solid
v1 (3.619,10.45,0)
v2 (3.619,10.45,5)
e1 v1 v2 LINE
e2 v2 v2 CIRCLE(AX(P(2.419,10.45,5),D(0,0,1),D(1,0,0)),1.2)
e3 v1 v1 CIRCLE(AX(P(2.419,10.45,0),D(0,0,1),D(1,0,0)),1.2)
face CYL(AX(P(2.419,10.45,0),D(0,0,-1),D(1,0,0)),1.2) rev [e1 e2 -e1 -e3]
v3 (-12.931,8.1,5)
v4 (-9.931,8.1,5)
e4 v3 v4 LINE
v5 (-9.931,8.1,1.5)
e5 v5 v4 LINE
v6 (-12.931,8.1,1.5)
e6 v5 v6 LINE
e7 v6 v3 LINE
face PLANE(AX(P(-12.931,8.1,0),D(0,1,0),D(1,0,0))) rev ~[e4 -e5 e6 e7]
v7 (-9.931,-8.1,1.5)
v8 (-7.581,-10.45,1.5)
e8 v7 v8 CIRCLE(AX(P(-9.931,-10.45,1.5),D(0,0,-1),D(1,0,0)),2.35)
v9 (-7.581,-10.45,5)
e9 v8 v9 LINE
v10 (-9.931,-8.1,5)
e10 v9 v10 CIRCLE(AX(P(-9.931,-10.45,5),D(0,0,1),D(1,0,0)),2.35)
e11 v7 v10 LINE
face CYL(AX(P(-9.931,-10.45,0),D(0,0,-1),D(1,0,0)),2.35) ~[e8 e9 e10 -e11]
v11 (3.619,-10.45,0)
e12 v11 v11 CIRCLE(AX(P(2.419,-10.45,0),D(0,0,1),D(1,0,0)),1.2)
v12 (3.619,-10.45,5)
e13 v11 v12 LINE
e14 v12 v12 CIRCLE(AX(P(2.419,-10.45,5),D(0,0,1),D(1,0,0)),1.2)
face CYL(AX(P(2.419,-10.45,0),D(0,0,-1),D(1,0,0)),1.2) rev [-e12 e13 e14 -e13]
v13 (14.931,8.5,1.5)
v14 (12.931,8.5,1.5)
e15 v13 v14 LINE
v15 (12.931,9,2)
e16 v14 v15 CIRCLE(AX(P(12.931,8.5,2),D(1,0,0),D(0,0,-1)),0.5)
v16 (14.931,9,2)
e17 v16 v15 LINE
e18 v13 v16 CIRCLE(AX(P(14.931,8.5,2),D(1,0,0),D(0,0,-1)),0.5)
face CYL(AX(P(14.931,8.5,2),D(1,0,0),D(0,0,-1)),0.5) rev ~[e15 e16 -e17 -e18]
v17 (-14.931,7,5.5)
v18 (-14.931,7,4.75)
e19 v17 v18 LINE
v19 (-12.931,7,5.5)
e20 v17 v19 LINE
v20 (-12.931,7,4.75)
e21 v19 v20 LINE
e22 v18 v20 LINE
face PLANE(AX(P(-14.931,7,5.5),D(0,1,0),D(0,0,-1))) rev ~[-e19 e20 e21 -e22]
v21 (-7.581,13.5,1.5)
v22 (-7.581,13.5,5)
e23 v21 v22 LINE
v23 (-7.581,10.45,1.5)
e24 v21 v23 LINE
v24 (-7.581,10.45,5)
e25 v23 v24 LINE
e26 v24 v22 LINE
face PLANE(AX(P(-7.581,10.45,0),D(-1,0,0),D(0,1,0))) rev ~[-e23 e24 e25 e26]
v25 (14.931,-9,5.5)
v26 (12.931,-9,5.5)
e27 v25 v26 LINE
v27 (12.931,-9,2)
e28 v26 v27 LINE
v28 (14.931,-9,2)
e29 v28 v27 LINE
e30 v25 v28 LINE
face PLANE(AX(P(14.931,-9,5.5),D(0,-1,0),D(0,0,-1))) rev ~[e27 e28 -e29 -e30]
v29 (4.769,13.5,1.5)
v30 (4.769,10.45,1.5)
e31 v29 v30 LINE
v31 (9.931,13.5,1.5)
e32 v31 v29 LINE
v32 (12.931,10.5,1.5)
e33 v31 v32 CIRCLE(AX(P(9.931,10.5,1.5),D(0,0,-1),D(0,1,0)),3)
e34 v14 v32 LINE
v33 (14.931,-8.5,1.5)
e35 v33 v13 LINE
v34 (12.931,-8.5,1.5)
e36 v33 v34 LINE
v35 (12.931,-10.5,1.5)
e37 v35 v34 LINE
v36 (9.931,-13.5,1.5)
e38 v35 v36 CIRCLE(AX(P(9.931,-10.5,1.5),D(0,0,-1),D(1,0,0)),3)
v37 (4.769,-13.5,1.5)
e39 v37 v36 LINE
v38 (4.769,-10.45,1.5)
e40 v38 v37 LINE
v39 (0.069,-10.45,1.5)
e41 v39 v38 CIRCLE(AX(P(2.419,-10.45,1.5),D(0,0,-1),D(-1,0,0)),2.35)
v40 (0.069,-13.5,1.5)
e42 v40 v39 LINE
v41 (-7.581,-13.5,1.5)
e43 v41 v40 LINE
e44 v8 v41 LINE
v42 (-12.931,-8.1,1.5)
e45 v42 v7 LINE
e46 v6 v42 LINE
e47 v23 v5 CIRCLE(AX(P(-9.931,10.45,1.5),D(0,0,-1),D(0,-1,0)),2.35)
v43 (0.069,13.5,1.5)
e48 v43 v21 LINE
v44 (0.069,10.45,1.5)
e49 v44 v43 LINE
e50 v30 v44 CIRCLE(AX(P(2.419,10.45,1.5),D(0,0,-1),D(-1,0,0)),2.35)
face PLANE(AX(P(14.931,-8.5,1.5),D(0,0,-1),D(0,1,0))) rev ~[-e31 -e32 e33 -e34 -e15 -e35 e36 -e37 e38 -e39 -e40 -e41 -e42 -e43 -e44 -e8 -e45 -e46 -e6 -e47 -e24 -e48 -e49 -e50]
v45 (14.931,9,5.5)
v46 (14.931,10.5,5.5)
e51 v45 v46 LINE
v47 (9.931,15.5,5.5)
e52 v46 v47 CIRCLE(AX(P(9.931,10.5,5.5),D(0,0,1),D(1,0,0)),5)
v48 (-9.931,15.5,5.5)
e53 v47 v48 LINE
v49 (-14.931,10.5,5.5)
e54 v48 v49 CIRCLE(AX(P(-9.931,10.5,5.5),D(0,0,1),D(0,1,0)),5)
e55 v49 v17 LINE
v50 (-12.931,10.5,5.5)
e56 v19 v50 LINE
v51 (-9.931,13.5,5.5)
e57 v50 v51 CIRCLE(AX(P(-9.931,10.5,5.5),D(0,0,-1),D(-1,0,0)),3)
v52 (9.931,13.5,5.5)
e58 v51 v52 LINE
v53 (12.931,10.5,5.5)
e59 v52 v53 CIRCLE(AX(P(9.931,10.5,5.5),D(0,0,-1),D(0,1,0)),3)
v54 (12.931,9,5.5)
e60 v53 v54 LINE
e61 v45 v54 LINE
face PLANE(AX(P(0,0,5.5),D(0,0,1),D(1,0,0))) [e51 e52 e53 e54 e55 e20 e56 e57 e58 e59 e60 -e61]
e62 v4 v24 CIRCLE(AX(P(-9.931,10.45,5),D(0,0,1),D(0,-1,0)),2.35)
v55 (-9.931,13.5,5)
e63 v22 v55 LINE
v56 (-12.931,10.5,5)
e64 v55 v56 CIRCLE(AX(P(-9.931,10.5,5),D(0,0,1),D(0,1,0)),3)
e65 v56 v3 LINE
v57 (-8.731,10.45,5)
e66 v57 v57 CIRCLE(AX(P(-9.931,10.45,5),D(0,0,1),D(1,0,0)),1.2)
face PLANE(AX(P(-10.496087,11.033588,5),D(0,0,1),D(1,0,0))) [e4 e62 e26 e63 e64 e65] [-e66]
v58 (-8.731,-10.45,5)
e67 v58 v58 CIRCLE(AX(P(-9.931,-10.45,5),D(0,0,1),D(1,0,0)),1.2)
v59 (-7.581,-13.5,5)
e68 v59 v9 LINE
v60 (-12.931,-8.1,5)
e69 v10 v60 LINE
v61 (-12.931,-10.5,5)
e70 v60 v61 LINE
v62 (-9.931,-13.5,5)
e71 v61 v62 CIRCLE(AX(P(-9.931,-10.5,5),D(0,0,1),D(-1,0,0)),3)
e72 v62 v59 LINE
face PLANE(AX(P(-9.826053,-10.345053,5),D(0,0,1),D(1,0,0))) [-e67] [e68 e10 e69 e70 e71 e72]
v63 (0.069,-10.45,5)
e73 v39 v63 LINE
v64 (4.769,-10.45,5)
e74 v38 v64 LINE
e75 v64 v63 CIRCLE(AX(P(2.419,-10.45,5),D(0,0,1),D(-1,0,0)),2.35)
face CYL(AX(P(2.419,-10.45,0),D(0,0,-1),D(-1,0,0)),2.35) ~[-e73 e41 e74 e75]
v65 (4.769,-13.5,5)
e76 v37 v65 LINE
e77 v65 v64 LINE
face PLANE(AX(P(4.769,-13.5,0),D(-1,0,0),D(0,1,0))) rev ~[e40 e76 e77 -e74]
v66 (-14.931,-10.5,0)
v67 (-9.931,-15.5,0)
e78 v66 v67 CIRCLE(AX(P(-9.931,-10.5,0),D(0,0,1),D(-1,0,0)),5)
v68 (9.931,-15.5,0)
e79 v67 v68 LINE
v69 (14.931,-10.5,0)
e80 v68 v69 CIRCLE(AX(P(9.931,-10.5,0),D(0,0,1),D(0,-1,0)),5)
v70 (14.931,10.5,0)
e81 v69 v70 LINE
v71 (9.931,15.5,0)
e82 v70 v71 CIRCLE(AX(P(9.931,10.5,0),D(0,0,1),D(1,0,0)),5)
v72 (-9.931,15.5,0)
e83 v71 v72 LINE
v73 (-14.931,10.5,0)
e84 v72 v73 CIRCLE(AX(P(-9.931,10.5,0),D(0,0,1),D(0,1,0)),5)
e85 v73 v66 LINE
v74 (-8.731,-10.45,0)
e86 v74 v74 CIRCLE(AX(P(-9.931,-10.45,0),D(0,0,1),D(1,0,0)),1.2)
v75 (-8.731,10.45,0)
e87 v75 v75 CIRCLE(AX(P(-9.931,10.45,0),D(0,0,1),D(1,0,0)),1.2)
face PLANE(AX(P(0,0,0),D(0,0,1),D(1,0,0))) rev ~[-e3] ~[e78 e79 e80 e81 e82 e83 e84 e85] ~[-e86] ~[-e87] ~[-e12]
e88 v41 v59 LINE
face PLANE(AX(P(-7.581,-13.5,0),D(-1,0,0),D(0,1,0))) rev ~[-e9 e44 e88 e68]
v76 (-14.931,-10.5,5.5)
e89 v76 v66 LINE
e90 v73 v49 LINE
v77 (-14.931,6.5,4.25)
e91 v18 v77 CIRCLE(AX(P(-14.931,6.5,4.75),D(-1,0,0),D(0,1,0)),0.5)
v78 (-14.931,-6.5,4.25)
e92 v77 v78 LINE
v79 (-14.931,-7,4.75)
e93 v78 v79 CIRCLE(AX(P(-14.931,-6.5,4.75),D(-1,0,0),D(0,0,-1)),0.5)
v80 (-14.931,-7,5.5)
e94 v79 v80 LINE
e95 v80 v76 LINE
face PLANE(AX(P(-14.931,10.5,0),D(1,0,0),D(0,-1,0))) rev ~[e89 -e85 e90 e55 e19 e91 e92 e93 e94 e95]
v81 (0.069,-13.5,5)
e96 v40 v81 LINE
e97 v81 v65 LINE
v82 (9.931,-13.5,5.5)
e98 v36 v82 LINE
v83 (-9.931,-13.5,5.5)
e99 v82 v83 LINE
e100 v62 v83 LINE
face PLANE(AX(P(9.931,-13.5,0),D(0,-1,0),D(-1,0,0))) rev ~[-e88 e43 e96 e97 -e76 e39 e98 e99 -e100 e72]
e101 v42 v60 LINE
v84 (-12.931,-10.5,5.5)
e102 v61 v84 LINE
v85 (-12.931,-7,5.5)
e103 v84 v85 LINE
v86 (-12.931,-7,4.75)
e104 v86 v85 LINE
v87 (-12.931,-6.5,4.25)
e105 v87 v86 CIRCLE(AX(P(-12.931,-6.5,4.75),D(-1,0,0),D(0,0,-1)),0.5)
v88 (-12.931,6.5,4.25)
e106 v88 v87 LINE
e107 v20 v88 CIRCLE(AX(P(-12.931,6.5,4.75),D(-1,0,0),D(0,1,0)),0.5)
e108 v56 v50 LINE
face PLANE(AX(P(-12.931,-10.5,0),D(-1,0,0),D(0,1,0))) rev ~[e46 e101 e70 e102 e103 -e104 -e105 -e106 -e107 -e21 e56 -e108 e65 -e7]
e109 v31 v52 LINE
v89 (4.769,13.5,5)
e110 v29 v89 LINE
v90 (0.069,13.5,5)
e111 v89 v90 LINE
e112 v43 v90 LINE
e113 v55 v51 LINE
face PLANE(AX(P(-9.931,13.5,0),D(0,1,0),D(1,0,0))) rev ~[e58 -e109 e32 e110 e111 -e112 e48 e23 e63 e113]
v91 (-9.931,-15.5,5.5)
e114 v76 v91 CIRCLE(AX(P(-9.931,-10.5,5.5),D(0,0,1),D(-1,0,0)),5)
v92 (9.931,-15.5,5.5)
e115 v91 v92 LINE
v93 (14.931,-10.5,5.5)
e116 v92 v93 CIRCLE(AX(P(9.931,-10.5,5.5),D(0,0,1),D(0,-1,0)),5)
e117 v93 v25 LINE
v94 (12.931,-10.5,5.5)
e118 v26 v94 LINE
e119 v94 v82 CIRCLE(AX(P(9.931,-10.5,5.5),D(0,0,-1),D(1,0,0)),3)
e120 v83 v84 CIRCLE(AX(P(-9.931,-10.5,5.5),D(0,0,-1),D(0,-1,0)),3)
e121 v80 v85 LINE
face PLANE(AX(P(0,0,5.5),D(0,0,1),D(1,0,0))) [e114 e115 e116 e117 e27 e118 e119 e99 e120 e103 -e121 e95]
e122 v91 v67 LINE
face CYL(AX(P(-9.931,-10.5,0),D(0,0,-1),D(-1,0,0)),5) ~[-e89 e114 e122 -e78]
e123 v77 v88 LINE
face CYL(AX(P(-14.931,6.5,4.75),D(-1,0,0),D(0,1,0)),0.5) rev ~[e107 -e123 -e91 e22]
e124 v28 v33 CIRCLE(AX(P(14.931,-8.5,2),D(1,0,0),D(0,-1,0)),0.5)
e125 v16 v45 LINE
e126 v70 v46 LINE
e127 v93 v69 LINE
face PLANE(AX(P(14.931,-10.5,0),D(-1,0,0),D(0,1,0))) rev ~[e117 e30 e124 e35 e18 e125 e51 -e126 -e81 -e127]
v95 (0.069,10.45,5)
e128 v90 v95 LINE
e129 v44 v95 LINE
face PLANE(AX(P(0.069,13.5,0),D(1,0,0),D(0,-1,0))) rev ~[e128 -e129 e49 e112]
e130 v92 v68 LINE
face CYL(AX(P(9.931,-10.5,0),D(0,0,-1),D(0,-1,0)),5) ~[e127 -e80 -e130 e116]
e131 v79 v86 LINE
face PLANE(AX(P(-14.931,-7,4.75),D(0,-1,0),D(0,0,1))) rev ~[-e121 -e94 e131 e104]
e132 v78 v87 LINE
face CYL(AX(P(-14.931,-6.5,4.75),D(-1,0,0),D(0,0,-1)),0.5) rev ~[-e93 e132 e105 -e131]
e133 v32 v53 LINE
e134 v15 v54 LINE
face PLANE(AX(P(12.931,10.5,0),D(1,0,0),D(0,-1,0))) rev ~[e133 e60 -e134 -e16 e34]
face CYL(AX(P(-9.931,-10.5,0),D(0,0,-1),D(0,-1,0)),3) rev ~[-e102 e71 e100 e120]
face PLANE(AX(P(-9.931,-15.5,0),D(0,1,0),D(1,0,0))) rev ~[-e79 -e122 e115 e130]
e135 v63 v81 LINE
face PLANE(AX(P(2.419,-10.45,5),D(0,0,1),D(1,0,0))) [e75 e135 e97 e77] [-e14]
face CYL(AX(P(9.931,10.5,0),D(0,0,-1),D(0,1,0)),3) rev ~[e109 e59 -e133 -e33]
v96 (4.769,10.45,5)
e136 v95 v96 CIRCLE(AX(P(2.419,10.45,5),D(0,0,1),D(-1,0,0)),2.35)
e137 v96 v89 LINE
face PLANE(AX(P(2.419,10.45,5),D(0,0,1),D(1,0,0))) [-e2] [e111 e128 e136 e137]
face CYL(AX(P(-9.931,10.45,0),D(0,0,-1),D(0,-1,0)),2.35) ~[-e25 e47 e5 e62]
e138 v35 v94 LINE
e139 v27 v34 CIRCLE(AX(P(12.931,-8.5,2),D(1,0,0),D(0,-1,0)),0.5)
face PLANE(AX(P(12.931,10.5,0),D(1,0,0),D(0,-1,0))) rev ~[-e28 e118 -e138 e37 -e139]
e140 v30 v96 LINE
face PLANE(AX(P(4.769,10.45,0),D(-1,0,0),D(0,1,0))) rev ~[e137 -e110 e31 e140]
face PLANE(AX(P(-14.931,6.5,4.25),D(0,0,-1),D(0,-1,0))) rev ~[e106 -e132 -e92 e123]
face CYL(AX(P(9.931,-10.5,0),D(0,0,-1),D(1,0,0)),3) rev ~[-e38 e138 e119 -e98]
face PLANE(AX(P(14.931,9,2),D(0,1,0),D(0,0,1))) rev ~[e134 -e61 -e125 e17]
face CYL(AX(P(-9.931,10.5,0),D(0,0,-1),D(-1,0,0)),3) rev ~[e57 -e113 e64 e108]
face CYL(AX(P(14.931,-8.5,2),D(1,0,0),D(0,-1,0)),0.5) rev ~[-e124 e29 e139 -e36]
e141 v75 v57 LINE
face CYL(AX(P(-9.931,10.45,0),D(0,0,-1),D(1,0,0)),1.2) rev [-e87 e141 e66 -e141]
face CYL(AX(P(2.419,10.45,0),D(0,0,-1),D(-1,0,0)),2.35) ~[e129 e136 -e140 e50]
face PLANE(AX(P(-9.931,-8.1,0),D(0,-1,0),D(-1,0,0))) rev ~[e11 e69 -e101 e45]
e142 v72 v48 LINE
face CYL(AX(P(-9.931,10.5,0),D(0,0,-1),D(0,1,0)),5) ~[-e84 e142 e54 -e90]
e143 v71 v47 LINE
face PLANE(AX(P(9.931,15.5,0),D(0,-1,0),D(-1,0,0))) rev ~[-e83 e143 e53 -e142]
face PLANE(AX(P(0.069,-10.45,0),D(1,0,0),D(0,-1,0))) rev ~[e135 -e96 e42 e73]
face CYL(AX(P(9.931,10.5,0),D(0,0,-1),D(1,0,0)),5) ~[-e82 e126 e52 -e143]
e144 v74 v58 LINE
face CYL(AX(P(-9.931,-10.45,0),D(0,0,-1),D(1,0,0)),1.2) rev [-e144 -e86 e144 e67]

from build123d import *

# Parameters (mm, degrees)
F0_R     = 1.2
F1_DEPTH = 1.5
F2_DEPTH = 5
F3_DEPTH = 5.5
F5_DEPTH = 2
F7_DEPTH = 2


# Not quite as in the source:
# - a feature names something its author has since deleted; it is built from what else it names


with BuildPart() as f1:
    # F0 (on Top) → F1 (new body)
    with BuildSketch(Plane.XY):
        with BuildLine():
            Line((14.9310000289, -10.5), (14.9310000289, 10.5))
            ThreePointArc((14.9310000289, 10.5), (13.4665339264, 14.0355339264), (9.931, 15.5000000289))
            Line((9.931, 15.5000000289), (-9.931, 15.5000000289))
            ThreePointArc((-9.931, 15.5000000289), (-13.4665339264, 14.0355339264), (-14.9310000289, 10.5))
            Line((-14.9310000289, 10.5), (-14.9310000289, -10.5))
            ThreePointArc((-14.9310000289, -10.5), (-13.4665339264, -14.0355339264), (-9.931, -15.5000000289))
            Line((-9.931, -15.5000000289), (9.931, -15.5000000289))
            ThreePointArc((9.931, -15.5000000289), (13.4665339264, -14.0355339264), (14.9310000289, -10.5))
        make_face()
        with BuildLine():
            Line((-9.931, 13.5000000289), (-7.581, 13.5000000289))
            Line((-7.581, 13.5000000289), (0.069, 13.5000000289))
            Line((0.069, 13.5000000289), (4.769, 13.5000000289))
            Line((4.769, 13.5000000289), (9.931, 13.5000000289))
            ThreePointArc((9.931, 13.5000000289), (12.052320364, 12.621320364), (12.9310000289, 10.5))
            Line((12.9310000289, 10.5), (12.9310000289, -10.5))
            ThreePointArc((12.9310000289, -10.5), (12.052320364, -12.621320364), (9.931, -13.5000000289))
            Line((9.931, -13.5000000289), (4.769, -13.5000000289))
            Line((4.769, -13.5000000289), (0.069, -13.5000000289))
            Line((0.069, -13.5000000289), (-7.581, -13.5000000289))
            Line((-7.581, -13.5000000289), (-9.931, -13.5000000289))
            ThreePointArc((-9.931, -13.5000000289), (-12.052320364, -12.621320364), (-12.9310000289, -10.5))
            Line((-12.9310000289, -10.5), (-12.9310000289, -8.1))
            Line((-12.9310000289, -8.1), (-12.9310000289, 8.1))
            Line((-12.9310000289, 8.1), (-12.9310000289, 10.5))
            ThreePointArc((-12.9310000289, 10.5), (-12.052320364, 12.621320364), (-9.931, 13.5000000289))
        make_face(mode=Mode.SUBTRACT)
        with BuildLine():
            ThreePointArc((4.769, -10.45), (2.419, -8.1), (0.069, -10.45))
            ThreePointArc((0.069, -10.45), (2.419, -12.8), (4.769, -10.45))
        make_face()
        with Locations((2.419, -10.45)):
            Circle(F0_R, mode=Mode.SUBTRACT)
        with BuildLine():
            ThreePointArc((4.769, 10.45), (2.419, 12.8), (0.069, 10.45))
            ThreePointArc((0.069, 10.45), (2.419, 8.1), (4.769, 10.45))
        make_face()
        with Locations((2.419, 10.45)):
            Circle(F0_R, mode=Mode.SUBTRACT)
        with BuildLine():
            ThreePointArc((-9.931, 8.1), (-11.5927009358, 12.1117009358), (-7.581, 10.45))
            Line((-7.581, 10.45), (-7.581, 13.5000000289))
            Line((-7.581, 13.5000000289), (-9.931, 13.5000000289))
            ThreePointArc((-9.931, 13.5000000289), (-12.052320364, 12.621320364), (-12.9310000289, 10.5))
            Line((-12.9310000289, 10.5), (-12.9310000289, 8.1))
            Line((-12.9310000289, 8.1), (-9.931, 8.1))
        make_face()
        with BuildLine():
            Line((-9.931, -8.1), (-12.9310000289, -8.1))
            Line((-12.9310000289, -8.1), (-12.9310000289, -10.5))
            ThreePointArc((-12.9310000289, -10.5), (-12.052320364, -12.621320364), (-9.931, -13.5000000289))
            Line((-9.931, -13.5000000289), (-7.581, -13.5000000289))
            Line((-7.581, -13.5000000289), (-7.581, -10.45))
            ThreePointArc((-7.581, -10.45), (-11.5927009358, -12.1117009358), (-9.931, -8.1))
        make_face()
        with BuildLine():
            ThreePointArc((-7.581, -10.45), (-8.2692990642, -8.7882990642), (-9.931, -8.1))
            ThreePointArc((-9.931, -8.1), (-11.5927009358, -12.1117009358), (-7.581, -10.45))
        make_face()
        with Locations((-9.931, -10.45)):
            Circle(F0_R, mode=Mode.SUBTRACT)
        with BuildLine():
            Line((0.069, -10.45), (0.069, -13.5000000289))
            Line((0.069, -13.5000000289), (4.769, -13.5000000289))
            Line((4.769, -13.5000000289), (4.769, -10.45))
            ThreePointArc((4.769, -10.45), (2.419, -12.8), (0.069, -10.45))
        make_face()
        with BuildLine():
            ThreePointArc((-9.931, 8.1), (-8.2692990642, 8.7882990642), (-7.581, 10.45))
            ThreePointArc((-7.581, 10.45), (-11.5927009358, 12.1117009358), (-9.931, 8.1))
        make_face()
        with Locations((-9.931, 10.45)):
            Circle(F0_R, mode=Mode.SUBTRACT)
        with BuildLine():
            Line((4.769, 13.5000000289), (0.069, 13.5000000289))
            Line((0.069, 13.5000000289), (0.069, 10.45))
            ThreePointArc((0.069, 10.45), (2.419, 12.8), (4.769, 10.45))
            Line((4.769, 10.45), (4.769, 13.5000000289))
        make_face()
        with BuildLine():
            Line((-7.581, 13.5000000289), (-7.581, 10.45))
            ThreePointArc((-7.581, 10.45), (-8.2692990642, 8.7882990642), (-9.931, 8.1))
            Line((-9.931, 8.1), (-12.9310000289, 8.1))
            Line((-12.9310000289, 8.1), (-12.9310000289, -8.1))
            Line((-12.9310000289, -8.1), (-9.931, -8.1))
            ThreePointArc((-9.931, -8.1), (-8.2692990642, -8.7882990642), (-7.581, -10.45))
            Line((-7.581, -10.45), (-7.581, -13.5000000289))
            Line((-7.581, -13.5000000289), (0.069, -13.5000000289))
            Line((0.069, -13.5000000289), (0.069, -10.45))
            ThreePointArc((0.069, -10.45), (2.419, -8.1), (4.769, -10.45))
            Line((4.769, -10.45), (4.769, -13.5000000289))
            Line((4.769, -13.5000000289), (9.931, -13.5000000289))
            ThreePointArc((9.931, -13.5000000289), (12.052320364, -12.621320364), (12.9310000289, -10.5))
            Line((12.9310000289, -10.5), (12.9310000289, 10.5))
            ThreePointArc((12.9310000289, 10.5), (12.052320364, 12.621320364), (9.931, 13.5000000289))
            Line((9.931, 13.5000000289), (4.769, 13.5000000289))
            Line((4.769, 13.5000000289), (4.769, 10.45))
            ThreePointArc((4.769, 10.45), (2.419, 8.1), (0.069, 10.45))
            Line((0.069, 10.45), (0.069, 13.5000000289))
            Line((0.069, 13.5000000289), (-7.581, 13.5000000289))
        make_face()
    extrude(amount=F1_DEPTH)

    # F0 (on Top) → F2 (join)
    with BuildSketch(Plane.XY):
        with BuildLine():
            ThreePointArc((-9.931, 8.1), (-11.5927009358, 12.1117009358), (-7.581, 10.45))
            Line((-7.581, 10.45), (-7.581, 13.5000000289))
            Line((-7.581, 13.5000000289), (-9.931, 13.5000000289))
            ThreePointArc((-9.931, 13.5000000289), (-12.052320364, 12.621320364), (-12.9310000289, 10.5))
            Line((-12.9310000289, 10.5), (-12.9310000289, 8.1))
            Line((-12.9310000289, 8.1), (-9.931, 8.1))
        make_face()
        with BuildLine():
            ThreePointArc((-9.931, 8.1), (-8.2692990642, 8.7882990642), (-7.581, 10.45))
            ThreePointArc((-7.581, 10.45), (-11.5927009358, 12.1117009358), (-9.931, 8.1))
        make_face()
        with Locations((-9.931, 10.45)):
            Circle(F0_R, mode=Mode.SUBTRACT)
        with BuildLine():
            ThreePointArc((4.769, 10.45), (2.419, 12.8), (0.069, 10.45))
            ThreePointArc((0.069, 10.45), (2.419, 8.1), (4.769, 10.45))
        make_face()
        with Locations((2.419, 10.45)):
            Circle(F0_R, mode=Mode.SUBTRACT)
        with BuildLine():
            Line((4.769, 13.5000000289), (0.069, 13.5000000289))
            Line((0.069, 13.5000000289), (0.069, 10.45))
            ThreePointArc((0.069, 10.45), (2.419, 12.8), (4.769, 10.45))
            Line((4.769, 10.45), (4.769, 13.5000000289))
        make_face()
        with BuildLine():
            ThreePointArc((4.769, -10.45), (2.419, -8.1), (0.069, -10.45))
            ThreePointArc((0.069, -10.45), (2.419, -12.8), (4.769, -10.45))
        make_face()
        with Locations((2.419, -10.45)):
            Circle(F0_R, mode=Mode.SUBTRACT)
        with BuildLine():
            Line((0.069, -10.45), (0.069, -13.5000000289))
            Line((0.069, -13.5000000289), (4.769, -13.5000000289))
            Line((4.769, -13.5000000289), (4.769, -10.45))
            ThreePointArc((4.769, -10.45), (2.419, -12.8), (0.069, -10.45))
        make_face()
        with BuildLine():
            ThreePointArc((-7.581, -10.45), (-8.2692990642, -8.7882990642), (-9.931, -8.1))
            ThreePointArc((-9.931, -8.1), (-11.5927009358, -12.1117009358), (-7.581, -10.45))
        make_face()
        with Locations((-9.931, -10.45)):
            Circle(F0_R, mode=Mode.SUBTRACT)
        with BuildLine():
            Line((-9.931, -8.1), (-12.9310000289, -8.1))
            Line((-12.9310000289, -8.1), (-12.9310000289, -10.5))
            ThreePointArc((-12.9310000289, -10.5), (-12.052320364, -12.621320364), (-9.931, -13.5000000289))
            Line((-9.931, -13.5000000289), (-7.581, -13.5000000289))
            Line((-7.581, -13.5000000289), (-7.581, -10.45))
            ThreePointArc((-7.581, -10.45), (-11.5927009358, -12.1117009358), (-9.931, -8.1))
        make_face()
    extrude(amount=F2_DEPTH)

    # F0 (on Top) → F3 (join)
    with BuildSketch(Plane.XY):
        with BuildLine():
            Line((14.9310000289, -10.5), (14.9310000289, 10.5))
            ThreePointArc((14.9310000289, 10.5), (13.4665339264, 14.0355339264), (9.931, 15.5000000289))
            Line((9.931, 15.5000000289), (-9.931, 15.5000000289))
            ThreePointArc((-9.931, 15.5000000289), (-13.4665339264, 14.0355339264), (-14.9310000289, 10.5))
            Line((-14.9310000289, 10.5), (-14.9310000289, -10.5))
            ThreePointArc((-14.9310000289, -10.5), (-13.4665339264, -14.0355339264), (-9.931, -15.5000000289))
            Line((-9.931, -15.5000000289), (9.931, -15.5000000289))
            ThreePointArc((9.931, -15.5000000289), (13.4665339264, -14.0355339264), (14.9310000289, -10.5))
        make_face()
        with BuildLine():
            Line((-9.931, 13.5000000289), (-7.581, 13.5000000289))
            Line((-7.581, 13.5000000289), (0.069, 13.5000000289))
            Line((0.069, 13.5000000289), (4.769, 13.5000000289))
            Line((4.769, 13.5000000289), (9.931, 13.5000000289))
            ThreePointArc((9.931, 13.5000000289), (12.052320364, 12.621320364), (12.9310000289, 10.5))
            Line((12.9310000289, 10.5), (12.9310000289, -10.5))
            ThreePointArc((12.9310000289, -10.5), (12.052320364, -12.621320364), (9.931, -13.5000000289))
            Line((9.931, -13.5000000289), (4.769, -13.5000000289))
            Line((4.769, -13.5000000289), (0.069, -13.5000000289))
            Line((0.069, -13.5000000289), (-7.581, -13.5000000289))
            Line((-7.581, -13.5000000289), (-9.931, -13.5000000289))
            ThreePointArc((-9.931, -13.5000000289), (-12.052320364, -12.621320364), (-12.9310000289, -10.5))
            Line((-12.9310000289, -10.5), (-12.9310000289, -8.1))
            Line((-12.9310000289, -8.1), (-12.9310000289, 8.1))
            Line((-12.9310000289, 8.1), (-12.9310000289, 10.5))
            ThreePointArc((-12.9310000289, 10.5), (-12.052320364, 12.621320364), (-9.931, 13.5000000289))
        make_face(mode=Mode.SUBTRACT)
    extrude(amount=F3_DEPTH)

    # F4 (on face) → F5 (cut)
    with BuildSketch(Plane(origin=(-14.9310000289, 0, 0), x_dir=(0, -1, 0), z_dir=(-1, 0, 0))):
        with BuildLine():
            Line((7, 5.5), (-7, 5.5))
            Line((-7, 5.5), (-7, 4.75))
            ThreePointArc((-7, 4.75), (-6.8535533906, 4.3964466094), (-6.5, 4.25))
            Line((-6.5, 4.25), (6.5, 4.25))
            ThreePointArc((6.5, 4.25), (6.8535533906, 4.3964466094), (7, 4.75))
            Line((7, 4.75), (7, 5.5))
        make_face()
    extrude(amount=-F5_DEPTH, mode=Mode.SUBTRACT)

    # F6 (on face) → F7 (cut)
    with BuildSketch(Plane.YZ.offset(14.9310000289)):
        with BuildLine():
            Line((9, 2), (9, 5.5))
            Line((9, 5.5), (-9, 5.5))
            Line((-9, 5.5), (-9, 2))
            ThreePointArc((-9, 2), (-8.8535533906, 1.6464466094), (-8.5, 1.5))
            Line((-8.5, 1.5), (8.5, 1.5))
            ThreePointArc((8.5, 1.5), (8.8535533906, 1.6464466094), (9, 2))
        make_face()
    extrude(amount=-F7_DEPTH, mode=Mode.SUBTRACT)


solid = f1.part
